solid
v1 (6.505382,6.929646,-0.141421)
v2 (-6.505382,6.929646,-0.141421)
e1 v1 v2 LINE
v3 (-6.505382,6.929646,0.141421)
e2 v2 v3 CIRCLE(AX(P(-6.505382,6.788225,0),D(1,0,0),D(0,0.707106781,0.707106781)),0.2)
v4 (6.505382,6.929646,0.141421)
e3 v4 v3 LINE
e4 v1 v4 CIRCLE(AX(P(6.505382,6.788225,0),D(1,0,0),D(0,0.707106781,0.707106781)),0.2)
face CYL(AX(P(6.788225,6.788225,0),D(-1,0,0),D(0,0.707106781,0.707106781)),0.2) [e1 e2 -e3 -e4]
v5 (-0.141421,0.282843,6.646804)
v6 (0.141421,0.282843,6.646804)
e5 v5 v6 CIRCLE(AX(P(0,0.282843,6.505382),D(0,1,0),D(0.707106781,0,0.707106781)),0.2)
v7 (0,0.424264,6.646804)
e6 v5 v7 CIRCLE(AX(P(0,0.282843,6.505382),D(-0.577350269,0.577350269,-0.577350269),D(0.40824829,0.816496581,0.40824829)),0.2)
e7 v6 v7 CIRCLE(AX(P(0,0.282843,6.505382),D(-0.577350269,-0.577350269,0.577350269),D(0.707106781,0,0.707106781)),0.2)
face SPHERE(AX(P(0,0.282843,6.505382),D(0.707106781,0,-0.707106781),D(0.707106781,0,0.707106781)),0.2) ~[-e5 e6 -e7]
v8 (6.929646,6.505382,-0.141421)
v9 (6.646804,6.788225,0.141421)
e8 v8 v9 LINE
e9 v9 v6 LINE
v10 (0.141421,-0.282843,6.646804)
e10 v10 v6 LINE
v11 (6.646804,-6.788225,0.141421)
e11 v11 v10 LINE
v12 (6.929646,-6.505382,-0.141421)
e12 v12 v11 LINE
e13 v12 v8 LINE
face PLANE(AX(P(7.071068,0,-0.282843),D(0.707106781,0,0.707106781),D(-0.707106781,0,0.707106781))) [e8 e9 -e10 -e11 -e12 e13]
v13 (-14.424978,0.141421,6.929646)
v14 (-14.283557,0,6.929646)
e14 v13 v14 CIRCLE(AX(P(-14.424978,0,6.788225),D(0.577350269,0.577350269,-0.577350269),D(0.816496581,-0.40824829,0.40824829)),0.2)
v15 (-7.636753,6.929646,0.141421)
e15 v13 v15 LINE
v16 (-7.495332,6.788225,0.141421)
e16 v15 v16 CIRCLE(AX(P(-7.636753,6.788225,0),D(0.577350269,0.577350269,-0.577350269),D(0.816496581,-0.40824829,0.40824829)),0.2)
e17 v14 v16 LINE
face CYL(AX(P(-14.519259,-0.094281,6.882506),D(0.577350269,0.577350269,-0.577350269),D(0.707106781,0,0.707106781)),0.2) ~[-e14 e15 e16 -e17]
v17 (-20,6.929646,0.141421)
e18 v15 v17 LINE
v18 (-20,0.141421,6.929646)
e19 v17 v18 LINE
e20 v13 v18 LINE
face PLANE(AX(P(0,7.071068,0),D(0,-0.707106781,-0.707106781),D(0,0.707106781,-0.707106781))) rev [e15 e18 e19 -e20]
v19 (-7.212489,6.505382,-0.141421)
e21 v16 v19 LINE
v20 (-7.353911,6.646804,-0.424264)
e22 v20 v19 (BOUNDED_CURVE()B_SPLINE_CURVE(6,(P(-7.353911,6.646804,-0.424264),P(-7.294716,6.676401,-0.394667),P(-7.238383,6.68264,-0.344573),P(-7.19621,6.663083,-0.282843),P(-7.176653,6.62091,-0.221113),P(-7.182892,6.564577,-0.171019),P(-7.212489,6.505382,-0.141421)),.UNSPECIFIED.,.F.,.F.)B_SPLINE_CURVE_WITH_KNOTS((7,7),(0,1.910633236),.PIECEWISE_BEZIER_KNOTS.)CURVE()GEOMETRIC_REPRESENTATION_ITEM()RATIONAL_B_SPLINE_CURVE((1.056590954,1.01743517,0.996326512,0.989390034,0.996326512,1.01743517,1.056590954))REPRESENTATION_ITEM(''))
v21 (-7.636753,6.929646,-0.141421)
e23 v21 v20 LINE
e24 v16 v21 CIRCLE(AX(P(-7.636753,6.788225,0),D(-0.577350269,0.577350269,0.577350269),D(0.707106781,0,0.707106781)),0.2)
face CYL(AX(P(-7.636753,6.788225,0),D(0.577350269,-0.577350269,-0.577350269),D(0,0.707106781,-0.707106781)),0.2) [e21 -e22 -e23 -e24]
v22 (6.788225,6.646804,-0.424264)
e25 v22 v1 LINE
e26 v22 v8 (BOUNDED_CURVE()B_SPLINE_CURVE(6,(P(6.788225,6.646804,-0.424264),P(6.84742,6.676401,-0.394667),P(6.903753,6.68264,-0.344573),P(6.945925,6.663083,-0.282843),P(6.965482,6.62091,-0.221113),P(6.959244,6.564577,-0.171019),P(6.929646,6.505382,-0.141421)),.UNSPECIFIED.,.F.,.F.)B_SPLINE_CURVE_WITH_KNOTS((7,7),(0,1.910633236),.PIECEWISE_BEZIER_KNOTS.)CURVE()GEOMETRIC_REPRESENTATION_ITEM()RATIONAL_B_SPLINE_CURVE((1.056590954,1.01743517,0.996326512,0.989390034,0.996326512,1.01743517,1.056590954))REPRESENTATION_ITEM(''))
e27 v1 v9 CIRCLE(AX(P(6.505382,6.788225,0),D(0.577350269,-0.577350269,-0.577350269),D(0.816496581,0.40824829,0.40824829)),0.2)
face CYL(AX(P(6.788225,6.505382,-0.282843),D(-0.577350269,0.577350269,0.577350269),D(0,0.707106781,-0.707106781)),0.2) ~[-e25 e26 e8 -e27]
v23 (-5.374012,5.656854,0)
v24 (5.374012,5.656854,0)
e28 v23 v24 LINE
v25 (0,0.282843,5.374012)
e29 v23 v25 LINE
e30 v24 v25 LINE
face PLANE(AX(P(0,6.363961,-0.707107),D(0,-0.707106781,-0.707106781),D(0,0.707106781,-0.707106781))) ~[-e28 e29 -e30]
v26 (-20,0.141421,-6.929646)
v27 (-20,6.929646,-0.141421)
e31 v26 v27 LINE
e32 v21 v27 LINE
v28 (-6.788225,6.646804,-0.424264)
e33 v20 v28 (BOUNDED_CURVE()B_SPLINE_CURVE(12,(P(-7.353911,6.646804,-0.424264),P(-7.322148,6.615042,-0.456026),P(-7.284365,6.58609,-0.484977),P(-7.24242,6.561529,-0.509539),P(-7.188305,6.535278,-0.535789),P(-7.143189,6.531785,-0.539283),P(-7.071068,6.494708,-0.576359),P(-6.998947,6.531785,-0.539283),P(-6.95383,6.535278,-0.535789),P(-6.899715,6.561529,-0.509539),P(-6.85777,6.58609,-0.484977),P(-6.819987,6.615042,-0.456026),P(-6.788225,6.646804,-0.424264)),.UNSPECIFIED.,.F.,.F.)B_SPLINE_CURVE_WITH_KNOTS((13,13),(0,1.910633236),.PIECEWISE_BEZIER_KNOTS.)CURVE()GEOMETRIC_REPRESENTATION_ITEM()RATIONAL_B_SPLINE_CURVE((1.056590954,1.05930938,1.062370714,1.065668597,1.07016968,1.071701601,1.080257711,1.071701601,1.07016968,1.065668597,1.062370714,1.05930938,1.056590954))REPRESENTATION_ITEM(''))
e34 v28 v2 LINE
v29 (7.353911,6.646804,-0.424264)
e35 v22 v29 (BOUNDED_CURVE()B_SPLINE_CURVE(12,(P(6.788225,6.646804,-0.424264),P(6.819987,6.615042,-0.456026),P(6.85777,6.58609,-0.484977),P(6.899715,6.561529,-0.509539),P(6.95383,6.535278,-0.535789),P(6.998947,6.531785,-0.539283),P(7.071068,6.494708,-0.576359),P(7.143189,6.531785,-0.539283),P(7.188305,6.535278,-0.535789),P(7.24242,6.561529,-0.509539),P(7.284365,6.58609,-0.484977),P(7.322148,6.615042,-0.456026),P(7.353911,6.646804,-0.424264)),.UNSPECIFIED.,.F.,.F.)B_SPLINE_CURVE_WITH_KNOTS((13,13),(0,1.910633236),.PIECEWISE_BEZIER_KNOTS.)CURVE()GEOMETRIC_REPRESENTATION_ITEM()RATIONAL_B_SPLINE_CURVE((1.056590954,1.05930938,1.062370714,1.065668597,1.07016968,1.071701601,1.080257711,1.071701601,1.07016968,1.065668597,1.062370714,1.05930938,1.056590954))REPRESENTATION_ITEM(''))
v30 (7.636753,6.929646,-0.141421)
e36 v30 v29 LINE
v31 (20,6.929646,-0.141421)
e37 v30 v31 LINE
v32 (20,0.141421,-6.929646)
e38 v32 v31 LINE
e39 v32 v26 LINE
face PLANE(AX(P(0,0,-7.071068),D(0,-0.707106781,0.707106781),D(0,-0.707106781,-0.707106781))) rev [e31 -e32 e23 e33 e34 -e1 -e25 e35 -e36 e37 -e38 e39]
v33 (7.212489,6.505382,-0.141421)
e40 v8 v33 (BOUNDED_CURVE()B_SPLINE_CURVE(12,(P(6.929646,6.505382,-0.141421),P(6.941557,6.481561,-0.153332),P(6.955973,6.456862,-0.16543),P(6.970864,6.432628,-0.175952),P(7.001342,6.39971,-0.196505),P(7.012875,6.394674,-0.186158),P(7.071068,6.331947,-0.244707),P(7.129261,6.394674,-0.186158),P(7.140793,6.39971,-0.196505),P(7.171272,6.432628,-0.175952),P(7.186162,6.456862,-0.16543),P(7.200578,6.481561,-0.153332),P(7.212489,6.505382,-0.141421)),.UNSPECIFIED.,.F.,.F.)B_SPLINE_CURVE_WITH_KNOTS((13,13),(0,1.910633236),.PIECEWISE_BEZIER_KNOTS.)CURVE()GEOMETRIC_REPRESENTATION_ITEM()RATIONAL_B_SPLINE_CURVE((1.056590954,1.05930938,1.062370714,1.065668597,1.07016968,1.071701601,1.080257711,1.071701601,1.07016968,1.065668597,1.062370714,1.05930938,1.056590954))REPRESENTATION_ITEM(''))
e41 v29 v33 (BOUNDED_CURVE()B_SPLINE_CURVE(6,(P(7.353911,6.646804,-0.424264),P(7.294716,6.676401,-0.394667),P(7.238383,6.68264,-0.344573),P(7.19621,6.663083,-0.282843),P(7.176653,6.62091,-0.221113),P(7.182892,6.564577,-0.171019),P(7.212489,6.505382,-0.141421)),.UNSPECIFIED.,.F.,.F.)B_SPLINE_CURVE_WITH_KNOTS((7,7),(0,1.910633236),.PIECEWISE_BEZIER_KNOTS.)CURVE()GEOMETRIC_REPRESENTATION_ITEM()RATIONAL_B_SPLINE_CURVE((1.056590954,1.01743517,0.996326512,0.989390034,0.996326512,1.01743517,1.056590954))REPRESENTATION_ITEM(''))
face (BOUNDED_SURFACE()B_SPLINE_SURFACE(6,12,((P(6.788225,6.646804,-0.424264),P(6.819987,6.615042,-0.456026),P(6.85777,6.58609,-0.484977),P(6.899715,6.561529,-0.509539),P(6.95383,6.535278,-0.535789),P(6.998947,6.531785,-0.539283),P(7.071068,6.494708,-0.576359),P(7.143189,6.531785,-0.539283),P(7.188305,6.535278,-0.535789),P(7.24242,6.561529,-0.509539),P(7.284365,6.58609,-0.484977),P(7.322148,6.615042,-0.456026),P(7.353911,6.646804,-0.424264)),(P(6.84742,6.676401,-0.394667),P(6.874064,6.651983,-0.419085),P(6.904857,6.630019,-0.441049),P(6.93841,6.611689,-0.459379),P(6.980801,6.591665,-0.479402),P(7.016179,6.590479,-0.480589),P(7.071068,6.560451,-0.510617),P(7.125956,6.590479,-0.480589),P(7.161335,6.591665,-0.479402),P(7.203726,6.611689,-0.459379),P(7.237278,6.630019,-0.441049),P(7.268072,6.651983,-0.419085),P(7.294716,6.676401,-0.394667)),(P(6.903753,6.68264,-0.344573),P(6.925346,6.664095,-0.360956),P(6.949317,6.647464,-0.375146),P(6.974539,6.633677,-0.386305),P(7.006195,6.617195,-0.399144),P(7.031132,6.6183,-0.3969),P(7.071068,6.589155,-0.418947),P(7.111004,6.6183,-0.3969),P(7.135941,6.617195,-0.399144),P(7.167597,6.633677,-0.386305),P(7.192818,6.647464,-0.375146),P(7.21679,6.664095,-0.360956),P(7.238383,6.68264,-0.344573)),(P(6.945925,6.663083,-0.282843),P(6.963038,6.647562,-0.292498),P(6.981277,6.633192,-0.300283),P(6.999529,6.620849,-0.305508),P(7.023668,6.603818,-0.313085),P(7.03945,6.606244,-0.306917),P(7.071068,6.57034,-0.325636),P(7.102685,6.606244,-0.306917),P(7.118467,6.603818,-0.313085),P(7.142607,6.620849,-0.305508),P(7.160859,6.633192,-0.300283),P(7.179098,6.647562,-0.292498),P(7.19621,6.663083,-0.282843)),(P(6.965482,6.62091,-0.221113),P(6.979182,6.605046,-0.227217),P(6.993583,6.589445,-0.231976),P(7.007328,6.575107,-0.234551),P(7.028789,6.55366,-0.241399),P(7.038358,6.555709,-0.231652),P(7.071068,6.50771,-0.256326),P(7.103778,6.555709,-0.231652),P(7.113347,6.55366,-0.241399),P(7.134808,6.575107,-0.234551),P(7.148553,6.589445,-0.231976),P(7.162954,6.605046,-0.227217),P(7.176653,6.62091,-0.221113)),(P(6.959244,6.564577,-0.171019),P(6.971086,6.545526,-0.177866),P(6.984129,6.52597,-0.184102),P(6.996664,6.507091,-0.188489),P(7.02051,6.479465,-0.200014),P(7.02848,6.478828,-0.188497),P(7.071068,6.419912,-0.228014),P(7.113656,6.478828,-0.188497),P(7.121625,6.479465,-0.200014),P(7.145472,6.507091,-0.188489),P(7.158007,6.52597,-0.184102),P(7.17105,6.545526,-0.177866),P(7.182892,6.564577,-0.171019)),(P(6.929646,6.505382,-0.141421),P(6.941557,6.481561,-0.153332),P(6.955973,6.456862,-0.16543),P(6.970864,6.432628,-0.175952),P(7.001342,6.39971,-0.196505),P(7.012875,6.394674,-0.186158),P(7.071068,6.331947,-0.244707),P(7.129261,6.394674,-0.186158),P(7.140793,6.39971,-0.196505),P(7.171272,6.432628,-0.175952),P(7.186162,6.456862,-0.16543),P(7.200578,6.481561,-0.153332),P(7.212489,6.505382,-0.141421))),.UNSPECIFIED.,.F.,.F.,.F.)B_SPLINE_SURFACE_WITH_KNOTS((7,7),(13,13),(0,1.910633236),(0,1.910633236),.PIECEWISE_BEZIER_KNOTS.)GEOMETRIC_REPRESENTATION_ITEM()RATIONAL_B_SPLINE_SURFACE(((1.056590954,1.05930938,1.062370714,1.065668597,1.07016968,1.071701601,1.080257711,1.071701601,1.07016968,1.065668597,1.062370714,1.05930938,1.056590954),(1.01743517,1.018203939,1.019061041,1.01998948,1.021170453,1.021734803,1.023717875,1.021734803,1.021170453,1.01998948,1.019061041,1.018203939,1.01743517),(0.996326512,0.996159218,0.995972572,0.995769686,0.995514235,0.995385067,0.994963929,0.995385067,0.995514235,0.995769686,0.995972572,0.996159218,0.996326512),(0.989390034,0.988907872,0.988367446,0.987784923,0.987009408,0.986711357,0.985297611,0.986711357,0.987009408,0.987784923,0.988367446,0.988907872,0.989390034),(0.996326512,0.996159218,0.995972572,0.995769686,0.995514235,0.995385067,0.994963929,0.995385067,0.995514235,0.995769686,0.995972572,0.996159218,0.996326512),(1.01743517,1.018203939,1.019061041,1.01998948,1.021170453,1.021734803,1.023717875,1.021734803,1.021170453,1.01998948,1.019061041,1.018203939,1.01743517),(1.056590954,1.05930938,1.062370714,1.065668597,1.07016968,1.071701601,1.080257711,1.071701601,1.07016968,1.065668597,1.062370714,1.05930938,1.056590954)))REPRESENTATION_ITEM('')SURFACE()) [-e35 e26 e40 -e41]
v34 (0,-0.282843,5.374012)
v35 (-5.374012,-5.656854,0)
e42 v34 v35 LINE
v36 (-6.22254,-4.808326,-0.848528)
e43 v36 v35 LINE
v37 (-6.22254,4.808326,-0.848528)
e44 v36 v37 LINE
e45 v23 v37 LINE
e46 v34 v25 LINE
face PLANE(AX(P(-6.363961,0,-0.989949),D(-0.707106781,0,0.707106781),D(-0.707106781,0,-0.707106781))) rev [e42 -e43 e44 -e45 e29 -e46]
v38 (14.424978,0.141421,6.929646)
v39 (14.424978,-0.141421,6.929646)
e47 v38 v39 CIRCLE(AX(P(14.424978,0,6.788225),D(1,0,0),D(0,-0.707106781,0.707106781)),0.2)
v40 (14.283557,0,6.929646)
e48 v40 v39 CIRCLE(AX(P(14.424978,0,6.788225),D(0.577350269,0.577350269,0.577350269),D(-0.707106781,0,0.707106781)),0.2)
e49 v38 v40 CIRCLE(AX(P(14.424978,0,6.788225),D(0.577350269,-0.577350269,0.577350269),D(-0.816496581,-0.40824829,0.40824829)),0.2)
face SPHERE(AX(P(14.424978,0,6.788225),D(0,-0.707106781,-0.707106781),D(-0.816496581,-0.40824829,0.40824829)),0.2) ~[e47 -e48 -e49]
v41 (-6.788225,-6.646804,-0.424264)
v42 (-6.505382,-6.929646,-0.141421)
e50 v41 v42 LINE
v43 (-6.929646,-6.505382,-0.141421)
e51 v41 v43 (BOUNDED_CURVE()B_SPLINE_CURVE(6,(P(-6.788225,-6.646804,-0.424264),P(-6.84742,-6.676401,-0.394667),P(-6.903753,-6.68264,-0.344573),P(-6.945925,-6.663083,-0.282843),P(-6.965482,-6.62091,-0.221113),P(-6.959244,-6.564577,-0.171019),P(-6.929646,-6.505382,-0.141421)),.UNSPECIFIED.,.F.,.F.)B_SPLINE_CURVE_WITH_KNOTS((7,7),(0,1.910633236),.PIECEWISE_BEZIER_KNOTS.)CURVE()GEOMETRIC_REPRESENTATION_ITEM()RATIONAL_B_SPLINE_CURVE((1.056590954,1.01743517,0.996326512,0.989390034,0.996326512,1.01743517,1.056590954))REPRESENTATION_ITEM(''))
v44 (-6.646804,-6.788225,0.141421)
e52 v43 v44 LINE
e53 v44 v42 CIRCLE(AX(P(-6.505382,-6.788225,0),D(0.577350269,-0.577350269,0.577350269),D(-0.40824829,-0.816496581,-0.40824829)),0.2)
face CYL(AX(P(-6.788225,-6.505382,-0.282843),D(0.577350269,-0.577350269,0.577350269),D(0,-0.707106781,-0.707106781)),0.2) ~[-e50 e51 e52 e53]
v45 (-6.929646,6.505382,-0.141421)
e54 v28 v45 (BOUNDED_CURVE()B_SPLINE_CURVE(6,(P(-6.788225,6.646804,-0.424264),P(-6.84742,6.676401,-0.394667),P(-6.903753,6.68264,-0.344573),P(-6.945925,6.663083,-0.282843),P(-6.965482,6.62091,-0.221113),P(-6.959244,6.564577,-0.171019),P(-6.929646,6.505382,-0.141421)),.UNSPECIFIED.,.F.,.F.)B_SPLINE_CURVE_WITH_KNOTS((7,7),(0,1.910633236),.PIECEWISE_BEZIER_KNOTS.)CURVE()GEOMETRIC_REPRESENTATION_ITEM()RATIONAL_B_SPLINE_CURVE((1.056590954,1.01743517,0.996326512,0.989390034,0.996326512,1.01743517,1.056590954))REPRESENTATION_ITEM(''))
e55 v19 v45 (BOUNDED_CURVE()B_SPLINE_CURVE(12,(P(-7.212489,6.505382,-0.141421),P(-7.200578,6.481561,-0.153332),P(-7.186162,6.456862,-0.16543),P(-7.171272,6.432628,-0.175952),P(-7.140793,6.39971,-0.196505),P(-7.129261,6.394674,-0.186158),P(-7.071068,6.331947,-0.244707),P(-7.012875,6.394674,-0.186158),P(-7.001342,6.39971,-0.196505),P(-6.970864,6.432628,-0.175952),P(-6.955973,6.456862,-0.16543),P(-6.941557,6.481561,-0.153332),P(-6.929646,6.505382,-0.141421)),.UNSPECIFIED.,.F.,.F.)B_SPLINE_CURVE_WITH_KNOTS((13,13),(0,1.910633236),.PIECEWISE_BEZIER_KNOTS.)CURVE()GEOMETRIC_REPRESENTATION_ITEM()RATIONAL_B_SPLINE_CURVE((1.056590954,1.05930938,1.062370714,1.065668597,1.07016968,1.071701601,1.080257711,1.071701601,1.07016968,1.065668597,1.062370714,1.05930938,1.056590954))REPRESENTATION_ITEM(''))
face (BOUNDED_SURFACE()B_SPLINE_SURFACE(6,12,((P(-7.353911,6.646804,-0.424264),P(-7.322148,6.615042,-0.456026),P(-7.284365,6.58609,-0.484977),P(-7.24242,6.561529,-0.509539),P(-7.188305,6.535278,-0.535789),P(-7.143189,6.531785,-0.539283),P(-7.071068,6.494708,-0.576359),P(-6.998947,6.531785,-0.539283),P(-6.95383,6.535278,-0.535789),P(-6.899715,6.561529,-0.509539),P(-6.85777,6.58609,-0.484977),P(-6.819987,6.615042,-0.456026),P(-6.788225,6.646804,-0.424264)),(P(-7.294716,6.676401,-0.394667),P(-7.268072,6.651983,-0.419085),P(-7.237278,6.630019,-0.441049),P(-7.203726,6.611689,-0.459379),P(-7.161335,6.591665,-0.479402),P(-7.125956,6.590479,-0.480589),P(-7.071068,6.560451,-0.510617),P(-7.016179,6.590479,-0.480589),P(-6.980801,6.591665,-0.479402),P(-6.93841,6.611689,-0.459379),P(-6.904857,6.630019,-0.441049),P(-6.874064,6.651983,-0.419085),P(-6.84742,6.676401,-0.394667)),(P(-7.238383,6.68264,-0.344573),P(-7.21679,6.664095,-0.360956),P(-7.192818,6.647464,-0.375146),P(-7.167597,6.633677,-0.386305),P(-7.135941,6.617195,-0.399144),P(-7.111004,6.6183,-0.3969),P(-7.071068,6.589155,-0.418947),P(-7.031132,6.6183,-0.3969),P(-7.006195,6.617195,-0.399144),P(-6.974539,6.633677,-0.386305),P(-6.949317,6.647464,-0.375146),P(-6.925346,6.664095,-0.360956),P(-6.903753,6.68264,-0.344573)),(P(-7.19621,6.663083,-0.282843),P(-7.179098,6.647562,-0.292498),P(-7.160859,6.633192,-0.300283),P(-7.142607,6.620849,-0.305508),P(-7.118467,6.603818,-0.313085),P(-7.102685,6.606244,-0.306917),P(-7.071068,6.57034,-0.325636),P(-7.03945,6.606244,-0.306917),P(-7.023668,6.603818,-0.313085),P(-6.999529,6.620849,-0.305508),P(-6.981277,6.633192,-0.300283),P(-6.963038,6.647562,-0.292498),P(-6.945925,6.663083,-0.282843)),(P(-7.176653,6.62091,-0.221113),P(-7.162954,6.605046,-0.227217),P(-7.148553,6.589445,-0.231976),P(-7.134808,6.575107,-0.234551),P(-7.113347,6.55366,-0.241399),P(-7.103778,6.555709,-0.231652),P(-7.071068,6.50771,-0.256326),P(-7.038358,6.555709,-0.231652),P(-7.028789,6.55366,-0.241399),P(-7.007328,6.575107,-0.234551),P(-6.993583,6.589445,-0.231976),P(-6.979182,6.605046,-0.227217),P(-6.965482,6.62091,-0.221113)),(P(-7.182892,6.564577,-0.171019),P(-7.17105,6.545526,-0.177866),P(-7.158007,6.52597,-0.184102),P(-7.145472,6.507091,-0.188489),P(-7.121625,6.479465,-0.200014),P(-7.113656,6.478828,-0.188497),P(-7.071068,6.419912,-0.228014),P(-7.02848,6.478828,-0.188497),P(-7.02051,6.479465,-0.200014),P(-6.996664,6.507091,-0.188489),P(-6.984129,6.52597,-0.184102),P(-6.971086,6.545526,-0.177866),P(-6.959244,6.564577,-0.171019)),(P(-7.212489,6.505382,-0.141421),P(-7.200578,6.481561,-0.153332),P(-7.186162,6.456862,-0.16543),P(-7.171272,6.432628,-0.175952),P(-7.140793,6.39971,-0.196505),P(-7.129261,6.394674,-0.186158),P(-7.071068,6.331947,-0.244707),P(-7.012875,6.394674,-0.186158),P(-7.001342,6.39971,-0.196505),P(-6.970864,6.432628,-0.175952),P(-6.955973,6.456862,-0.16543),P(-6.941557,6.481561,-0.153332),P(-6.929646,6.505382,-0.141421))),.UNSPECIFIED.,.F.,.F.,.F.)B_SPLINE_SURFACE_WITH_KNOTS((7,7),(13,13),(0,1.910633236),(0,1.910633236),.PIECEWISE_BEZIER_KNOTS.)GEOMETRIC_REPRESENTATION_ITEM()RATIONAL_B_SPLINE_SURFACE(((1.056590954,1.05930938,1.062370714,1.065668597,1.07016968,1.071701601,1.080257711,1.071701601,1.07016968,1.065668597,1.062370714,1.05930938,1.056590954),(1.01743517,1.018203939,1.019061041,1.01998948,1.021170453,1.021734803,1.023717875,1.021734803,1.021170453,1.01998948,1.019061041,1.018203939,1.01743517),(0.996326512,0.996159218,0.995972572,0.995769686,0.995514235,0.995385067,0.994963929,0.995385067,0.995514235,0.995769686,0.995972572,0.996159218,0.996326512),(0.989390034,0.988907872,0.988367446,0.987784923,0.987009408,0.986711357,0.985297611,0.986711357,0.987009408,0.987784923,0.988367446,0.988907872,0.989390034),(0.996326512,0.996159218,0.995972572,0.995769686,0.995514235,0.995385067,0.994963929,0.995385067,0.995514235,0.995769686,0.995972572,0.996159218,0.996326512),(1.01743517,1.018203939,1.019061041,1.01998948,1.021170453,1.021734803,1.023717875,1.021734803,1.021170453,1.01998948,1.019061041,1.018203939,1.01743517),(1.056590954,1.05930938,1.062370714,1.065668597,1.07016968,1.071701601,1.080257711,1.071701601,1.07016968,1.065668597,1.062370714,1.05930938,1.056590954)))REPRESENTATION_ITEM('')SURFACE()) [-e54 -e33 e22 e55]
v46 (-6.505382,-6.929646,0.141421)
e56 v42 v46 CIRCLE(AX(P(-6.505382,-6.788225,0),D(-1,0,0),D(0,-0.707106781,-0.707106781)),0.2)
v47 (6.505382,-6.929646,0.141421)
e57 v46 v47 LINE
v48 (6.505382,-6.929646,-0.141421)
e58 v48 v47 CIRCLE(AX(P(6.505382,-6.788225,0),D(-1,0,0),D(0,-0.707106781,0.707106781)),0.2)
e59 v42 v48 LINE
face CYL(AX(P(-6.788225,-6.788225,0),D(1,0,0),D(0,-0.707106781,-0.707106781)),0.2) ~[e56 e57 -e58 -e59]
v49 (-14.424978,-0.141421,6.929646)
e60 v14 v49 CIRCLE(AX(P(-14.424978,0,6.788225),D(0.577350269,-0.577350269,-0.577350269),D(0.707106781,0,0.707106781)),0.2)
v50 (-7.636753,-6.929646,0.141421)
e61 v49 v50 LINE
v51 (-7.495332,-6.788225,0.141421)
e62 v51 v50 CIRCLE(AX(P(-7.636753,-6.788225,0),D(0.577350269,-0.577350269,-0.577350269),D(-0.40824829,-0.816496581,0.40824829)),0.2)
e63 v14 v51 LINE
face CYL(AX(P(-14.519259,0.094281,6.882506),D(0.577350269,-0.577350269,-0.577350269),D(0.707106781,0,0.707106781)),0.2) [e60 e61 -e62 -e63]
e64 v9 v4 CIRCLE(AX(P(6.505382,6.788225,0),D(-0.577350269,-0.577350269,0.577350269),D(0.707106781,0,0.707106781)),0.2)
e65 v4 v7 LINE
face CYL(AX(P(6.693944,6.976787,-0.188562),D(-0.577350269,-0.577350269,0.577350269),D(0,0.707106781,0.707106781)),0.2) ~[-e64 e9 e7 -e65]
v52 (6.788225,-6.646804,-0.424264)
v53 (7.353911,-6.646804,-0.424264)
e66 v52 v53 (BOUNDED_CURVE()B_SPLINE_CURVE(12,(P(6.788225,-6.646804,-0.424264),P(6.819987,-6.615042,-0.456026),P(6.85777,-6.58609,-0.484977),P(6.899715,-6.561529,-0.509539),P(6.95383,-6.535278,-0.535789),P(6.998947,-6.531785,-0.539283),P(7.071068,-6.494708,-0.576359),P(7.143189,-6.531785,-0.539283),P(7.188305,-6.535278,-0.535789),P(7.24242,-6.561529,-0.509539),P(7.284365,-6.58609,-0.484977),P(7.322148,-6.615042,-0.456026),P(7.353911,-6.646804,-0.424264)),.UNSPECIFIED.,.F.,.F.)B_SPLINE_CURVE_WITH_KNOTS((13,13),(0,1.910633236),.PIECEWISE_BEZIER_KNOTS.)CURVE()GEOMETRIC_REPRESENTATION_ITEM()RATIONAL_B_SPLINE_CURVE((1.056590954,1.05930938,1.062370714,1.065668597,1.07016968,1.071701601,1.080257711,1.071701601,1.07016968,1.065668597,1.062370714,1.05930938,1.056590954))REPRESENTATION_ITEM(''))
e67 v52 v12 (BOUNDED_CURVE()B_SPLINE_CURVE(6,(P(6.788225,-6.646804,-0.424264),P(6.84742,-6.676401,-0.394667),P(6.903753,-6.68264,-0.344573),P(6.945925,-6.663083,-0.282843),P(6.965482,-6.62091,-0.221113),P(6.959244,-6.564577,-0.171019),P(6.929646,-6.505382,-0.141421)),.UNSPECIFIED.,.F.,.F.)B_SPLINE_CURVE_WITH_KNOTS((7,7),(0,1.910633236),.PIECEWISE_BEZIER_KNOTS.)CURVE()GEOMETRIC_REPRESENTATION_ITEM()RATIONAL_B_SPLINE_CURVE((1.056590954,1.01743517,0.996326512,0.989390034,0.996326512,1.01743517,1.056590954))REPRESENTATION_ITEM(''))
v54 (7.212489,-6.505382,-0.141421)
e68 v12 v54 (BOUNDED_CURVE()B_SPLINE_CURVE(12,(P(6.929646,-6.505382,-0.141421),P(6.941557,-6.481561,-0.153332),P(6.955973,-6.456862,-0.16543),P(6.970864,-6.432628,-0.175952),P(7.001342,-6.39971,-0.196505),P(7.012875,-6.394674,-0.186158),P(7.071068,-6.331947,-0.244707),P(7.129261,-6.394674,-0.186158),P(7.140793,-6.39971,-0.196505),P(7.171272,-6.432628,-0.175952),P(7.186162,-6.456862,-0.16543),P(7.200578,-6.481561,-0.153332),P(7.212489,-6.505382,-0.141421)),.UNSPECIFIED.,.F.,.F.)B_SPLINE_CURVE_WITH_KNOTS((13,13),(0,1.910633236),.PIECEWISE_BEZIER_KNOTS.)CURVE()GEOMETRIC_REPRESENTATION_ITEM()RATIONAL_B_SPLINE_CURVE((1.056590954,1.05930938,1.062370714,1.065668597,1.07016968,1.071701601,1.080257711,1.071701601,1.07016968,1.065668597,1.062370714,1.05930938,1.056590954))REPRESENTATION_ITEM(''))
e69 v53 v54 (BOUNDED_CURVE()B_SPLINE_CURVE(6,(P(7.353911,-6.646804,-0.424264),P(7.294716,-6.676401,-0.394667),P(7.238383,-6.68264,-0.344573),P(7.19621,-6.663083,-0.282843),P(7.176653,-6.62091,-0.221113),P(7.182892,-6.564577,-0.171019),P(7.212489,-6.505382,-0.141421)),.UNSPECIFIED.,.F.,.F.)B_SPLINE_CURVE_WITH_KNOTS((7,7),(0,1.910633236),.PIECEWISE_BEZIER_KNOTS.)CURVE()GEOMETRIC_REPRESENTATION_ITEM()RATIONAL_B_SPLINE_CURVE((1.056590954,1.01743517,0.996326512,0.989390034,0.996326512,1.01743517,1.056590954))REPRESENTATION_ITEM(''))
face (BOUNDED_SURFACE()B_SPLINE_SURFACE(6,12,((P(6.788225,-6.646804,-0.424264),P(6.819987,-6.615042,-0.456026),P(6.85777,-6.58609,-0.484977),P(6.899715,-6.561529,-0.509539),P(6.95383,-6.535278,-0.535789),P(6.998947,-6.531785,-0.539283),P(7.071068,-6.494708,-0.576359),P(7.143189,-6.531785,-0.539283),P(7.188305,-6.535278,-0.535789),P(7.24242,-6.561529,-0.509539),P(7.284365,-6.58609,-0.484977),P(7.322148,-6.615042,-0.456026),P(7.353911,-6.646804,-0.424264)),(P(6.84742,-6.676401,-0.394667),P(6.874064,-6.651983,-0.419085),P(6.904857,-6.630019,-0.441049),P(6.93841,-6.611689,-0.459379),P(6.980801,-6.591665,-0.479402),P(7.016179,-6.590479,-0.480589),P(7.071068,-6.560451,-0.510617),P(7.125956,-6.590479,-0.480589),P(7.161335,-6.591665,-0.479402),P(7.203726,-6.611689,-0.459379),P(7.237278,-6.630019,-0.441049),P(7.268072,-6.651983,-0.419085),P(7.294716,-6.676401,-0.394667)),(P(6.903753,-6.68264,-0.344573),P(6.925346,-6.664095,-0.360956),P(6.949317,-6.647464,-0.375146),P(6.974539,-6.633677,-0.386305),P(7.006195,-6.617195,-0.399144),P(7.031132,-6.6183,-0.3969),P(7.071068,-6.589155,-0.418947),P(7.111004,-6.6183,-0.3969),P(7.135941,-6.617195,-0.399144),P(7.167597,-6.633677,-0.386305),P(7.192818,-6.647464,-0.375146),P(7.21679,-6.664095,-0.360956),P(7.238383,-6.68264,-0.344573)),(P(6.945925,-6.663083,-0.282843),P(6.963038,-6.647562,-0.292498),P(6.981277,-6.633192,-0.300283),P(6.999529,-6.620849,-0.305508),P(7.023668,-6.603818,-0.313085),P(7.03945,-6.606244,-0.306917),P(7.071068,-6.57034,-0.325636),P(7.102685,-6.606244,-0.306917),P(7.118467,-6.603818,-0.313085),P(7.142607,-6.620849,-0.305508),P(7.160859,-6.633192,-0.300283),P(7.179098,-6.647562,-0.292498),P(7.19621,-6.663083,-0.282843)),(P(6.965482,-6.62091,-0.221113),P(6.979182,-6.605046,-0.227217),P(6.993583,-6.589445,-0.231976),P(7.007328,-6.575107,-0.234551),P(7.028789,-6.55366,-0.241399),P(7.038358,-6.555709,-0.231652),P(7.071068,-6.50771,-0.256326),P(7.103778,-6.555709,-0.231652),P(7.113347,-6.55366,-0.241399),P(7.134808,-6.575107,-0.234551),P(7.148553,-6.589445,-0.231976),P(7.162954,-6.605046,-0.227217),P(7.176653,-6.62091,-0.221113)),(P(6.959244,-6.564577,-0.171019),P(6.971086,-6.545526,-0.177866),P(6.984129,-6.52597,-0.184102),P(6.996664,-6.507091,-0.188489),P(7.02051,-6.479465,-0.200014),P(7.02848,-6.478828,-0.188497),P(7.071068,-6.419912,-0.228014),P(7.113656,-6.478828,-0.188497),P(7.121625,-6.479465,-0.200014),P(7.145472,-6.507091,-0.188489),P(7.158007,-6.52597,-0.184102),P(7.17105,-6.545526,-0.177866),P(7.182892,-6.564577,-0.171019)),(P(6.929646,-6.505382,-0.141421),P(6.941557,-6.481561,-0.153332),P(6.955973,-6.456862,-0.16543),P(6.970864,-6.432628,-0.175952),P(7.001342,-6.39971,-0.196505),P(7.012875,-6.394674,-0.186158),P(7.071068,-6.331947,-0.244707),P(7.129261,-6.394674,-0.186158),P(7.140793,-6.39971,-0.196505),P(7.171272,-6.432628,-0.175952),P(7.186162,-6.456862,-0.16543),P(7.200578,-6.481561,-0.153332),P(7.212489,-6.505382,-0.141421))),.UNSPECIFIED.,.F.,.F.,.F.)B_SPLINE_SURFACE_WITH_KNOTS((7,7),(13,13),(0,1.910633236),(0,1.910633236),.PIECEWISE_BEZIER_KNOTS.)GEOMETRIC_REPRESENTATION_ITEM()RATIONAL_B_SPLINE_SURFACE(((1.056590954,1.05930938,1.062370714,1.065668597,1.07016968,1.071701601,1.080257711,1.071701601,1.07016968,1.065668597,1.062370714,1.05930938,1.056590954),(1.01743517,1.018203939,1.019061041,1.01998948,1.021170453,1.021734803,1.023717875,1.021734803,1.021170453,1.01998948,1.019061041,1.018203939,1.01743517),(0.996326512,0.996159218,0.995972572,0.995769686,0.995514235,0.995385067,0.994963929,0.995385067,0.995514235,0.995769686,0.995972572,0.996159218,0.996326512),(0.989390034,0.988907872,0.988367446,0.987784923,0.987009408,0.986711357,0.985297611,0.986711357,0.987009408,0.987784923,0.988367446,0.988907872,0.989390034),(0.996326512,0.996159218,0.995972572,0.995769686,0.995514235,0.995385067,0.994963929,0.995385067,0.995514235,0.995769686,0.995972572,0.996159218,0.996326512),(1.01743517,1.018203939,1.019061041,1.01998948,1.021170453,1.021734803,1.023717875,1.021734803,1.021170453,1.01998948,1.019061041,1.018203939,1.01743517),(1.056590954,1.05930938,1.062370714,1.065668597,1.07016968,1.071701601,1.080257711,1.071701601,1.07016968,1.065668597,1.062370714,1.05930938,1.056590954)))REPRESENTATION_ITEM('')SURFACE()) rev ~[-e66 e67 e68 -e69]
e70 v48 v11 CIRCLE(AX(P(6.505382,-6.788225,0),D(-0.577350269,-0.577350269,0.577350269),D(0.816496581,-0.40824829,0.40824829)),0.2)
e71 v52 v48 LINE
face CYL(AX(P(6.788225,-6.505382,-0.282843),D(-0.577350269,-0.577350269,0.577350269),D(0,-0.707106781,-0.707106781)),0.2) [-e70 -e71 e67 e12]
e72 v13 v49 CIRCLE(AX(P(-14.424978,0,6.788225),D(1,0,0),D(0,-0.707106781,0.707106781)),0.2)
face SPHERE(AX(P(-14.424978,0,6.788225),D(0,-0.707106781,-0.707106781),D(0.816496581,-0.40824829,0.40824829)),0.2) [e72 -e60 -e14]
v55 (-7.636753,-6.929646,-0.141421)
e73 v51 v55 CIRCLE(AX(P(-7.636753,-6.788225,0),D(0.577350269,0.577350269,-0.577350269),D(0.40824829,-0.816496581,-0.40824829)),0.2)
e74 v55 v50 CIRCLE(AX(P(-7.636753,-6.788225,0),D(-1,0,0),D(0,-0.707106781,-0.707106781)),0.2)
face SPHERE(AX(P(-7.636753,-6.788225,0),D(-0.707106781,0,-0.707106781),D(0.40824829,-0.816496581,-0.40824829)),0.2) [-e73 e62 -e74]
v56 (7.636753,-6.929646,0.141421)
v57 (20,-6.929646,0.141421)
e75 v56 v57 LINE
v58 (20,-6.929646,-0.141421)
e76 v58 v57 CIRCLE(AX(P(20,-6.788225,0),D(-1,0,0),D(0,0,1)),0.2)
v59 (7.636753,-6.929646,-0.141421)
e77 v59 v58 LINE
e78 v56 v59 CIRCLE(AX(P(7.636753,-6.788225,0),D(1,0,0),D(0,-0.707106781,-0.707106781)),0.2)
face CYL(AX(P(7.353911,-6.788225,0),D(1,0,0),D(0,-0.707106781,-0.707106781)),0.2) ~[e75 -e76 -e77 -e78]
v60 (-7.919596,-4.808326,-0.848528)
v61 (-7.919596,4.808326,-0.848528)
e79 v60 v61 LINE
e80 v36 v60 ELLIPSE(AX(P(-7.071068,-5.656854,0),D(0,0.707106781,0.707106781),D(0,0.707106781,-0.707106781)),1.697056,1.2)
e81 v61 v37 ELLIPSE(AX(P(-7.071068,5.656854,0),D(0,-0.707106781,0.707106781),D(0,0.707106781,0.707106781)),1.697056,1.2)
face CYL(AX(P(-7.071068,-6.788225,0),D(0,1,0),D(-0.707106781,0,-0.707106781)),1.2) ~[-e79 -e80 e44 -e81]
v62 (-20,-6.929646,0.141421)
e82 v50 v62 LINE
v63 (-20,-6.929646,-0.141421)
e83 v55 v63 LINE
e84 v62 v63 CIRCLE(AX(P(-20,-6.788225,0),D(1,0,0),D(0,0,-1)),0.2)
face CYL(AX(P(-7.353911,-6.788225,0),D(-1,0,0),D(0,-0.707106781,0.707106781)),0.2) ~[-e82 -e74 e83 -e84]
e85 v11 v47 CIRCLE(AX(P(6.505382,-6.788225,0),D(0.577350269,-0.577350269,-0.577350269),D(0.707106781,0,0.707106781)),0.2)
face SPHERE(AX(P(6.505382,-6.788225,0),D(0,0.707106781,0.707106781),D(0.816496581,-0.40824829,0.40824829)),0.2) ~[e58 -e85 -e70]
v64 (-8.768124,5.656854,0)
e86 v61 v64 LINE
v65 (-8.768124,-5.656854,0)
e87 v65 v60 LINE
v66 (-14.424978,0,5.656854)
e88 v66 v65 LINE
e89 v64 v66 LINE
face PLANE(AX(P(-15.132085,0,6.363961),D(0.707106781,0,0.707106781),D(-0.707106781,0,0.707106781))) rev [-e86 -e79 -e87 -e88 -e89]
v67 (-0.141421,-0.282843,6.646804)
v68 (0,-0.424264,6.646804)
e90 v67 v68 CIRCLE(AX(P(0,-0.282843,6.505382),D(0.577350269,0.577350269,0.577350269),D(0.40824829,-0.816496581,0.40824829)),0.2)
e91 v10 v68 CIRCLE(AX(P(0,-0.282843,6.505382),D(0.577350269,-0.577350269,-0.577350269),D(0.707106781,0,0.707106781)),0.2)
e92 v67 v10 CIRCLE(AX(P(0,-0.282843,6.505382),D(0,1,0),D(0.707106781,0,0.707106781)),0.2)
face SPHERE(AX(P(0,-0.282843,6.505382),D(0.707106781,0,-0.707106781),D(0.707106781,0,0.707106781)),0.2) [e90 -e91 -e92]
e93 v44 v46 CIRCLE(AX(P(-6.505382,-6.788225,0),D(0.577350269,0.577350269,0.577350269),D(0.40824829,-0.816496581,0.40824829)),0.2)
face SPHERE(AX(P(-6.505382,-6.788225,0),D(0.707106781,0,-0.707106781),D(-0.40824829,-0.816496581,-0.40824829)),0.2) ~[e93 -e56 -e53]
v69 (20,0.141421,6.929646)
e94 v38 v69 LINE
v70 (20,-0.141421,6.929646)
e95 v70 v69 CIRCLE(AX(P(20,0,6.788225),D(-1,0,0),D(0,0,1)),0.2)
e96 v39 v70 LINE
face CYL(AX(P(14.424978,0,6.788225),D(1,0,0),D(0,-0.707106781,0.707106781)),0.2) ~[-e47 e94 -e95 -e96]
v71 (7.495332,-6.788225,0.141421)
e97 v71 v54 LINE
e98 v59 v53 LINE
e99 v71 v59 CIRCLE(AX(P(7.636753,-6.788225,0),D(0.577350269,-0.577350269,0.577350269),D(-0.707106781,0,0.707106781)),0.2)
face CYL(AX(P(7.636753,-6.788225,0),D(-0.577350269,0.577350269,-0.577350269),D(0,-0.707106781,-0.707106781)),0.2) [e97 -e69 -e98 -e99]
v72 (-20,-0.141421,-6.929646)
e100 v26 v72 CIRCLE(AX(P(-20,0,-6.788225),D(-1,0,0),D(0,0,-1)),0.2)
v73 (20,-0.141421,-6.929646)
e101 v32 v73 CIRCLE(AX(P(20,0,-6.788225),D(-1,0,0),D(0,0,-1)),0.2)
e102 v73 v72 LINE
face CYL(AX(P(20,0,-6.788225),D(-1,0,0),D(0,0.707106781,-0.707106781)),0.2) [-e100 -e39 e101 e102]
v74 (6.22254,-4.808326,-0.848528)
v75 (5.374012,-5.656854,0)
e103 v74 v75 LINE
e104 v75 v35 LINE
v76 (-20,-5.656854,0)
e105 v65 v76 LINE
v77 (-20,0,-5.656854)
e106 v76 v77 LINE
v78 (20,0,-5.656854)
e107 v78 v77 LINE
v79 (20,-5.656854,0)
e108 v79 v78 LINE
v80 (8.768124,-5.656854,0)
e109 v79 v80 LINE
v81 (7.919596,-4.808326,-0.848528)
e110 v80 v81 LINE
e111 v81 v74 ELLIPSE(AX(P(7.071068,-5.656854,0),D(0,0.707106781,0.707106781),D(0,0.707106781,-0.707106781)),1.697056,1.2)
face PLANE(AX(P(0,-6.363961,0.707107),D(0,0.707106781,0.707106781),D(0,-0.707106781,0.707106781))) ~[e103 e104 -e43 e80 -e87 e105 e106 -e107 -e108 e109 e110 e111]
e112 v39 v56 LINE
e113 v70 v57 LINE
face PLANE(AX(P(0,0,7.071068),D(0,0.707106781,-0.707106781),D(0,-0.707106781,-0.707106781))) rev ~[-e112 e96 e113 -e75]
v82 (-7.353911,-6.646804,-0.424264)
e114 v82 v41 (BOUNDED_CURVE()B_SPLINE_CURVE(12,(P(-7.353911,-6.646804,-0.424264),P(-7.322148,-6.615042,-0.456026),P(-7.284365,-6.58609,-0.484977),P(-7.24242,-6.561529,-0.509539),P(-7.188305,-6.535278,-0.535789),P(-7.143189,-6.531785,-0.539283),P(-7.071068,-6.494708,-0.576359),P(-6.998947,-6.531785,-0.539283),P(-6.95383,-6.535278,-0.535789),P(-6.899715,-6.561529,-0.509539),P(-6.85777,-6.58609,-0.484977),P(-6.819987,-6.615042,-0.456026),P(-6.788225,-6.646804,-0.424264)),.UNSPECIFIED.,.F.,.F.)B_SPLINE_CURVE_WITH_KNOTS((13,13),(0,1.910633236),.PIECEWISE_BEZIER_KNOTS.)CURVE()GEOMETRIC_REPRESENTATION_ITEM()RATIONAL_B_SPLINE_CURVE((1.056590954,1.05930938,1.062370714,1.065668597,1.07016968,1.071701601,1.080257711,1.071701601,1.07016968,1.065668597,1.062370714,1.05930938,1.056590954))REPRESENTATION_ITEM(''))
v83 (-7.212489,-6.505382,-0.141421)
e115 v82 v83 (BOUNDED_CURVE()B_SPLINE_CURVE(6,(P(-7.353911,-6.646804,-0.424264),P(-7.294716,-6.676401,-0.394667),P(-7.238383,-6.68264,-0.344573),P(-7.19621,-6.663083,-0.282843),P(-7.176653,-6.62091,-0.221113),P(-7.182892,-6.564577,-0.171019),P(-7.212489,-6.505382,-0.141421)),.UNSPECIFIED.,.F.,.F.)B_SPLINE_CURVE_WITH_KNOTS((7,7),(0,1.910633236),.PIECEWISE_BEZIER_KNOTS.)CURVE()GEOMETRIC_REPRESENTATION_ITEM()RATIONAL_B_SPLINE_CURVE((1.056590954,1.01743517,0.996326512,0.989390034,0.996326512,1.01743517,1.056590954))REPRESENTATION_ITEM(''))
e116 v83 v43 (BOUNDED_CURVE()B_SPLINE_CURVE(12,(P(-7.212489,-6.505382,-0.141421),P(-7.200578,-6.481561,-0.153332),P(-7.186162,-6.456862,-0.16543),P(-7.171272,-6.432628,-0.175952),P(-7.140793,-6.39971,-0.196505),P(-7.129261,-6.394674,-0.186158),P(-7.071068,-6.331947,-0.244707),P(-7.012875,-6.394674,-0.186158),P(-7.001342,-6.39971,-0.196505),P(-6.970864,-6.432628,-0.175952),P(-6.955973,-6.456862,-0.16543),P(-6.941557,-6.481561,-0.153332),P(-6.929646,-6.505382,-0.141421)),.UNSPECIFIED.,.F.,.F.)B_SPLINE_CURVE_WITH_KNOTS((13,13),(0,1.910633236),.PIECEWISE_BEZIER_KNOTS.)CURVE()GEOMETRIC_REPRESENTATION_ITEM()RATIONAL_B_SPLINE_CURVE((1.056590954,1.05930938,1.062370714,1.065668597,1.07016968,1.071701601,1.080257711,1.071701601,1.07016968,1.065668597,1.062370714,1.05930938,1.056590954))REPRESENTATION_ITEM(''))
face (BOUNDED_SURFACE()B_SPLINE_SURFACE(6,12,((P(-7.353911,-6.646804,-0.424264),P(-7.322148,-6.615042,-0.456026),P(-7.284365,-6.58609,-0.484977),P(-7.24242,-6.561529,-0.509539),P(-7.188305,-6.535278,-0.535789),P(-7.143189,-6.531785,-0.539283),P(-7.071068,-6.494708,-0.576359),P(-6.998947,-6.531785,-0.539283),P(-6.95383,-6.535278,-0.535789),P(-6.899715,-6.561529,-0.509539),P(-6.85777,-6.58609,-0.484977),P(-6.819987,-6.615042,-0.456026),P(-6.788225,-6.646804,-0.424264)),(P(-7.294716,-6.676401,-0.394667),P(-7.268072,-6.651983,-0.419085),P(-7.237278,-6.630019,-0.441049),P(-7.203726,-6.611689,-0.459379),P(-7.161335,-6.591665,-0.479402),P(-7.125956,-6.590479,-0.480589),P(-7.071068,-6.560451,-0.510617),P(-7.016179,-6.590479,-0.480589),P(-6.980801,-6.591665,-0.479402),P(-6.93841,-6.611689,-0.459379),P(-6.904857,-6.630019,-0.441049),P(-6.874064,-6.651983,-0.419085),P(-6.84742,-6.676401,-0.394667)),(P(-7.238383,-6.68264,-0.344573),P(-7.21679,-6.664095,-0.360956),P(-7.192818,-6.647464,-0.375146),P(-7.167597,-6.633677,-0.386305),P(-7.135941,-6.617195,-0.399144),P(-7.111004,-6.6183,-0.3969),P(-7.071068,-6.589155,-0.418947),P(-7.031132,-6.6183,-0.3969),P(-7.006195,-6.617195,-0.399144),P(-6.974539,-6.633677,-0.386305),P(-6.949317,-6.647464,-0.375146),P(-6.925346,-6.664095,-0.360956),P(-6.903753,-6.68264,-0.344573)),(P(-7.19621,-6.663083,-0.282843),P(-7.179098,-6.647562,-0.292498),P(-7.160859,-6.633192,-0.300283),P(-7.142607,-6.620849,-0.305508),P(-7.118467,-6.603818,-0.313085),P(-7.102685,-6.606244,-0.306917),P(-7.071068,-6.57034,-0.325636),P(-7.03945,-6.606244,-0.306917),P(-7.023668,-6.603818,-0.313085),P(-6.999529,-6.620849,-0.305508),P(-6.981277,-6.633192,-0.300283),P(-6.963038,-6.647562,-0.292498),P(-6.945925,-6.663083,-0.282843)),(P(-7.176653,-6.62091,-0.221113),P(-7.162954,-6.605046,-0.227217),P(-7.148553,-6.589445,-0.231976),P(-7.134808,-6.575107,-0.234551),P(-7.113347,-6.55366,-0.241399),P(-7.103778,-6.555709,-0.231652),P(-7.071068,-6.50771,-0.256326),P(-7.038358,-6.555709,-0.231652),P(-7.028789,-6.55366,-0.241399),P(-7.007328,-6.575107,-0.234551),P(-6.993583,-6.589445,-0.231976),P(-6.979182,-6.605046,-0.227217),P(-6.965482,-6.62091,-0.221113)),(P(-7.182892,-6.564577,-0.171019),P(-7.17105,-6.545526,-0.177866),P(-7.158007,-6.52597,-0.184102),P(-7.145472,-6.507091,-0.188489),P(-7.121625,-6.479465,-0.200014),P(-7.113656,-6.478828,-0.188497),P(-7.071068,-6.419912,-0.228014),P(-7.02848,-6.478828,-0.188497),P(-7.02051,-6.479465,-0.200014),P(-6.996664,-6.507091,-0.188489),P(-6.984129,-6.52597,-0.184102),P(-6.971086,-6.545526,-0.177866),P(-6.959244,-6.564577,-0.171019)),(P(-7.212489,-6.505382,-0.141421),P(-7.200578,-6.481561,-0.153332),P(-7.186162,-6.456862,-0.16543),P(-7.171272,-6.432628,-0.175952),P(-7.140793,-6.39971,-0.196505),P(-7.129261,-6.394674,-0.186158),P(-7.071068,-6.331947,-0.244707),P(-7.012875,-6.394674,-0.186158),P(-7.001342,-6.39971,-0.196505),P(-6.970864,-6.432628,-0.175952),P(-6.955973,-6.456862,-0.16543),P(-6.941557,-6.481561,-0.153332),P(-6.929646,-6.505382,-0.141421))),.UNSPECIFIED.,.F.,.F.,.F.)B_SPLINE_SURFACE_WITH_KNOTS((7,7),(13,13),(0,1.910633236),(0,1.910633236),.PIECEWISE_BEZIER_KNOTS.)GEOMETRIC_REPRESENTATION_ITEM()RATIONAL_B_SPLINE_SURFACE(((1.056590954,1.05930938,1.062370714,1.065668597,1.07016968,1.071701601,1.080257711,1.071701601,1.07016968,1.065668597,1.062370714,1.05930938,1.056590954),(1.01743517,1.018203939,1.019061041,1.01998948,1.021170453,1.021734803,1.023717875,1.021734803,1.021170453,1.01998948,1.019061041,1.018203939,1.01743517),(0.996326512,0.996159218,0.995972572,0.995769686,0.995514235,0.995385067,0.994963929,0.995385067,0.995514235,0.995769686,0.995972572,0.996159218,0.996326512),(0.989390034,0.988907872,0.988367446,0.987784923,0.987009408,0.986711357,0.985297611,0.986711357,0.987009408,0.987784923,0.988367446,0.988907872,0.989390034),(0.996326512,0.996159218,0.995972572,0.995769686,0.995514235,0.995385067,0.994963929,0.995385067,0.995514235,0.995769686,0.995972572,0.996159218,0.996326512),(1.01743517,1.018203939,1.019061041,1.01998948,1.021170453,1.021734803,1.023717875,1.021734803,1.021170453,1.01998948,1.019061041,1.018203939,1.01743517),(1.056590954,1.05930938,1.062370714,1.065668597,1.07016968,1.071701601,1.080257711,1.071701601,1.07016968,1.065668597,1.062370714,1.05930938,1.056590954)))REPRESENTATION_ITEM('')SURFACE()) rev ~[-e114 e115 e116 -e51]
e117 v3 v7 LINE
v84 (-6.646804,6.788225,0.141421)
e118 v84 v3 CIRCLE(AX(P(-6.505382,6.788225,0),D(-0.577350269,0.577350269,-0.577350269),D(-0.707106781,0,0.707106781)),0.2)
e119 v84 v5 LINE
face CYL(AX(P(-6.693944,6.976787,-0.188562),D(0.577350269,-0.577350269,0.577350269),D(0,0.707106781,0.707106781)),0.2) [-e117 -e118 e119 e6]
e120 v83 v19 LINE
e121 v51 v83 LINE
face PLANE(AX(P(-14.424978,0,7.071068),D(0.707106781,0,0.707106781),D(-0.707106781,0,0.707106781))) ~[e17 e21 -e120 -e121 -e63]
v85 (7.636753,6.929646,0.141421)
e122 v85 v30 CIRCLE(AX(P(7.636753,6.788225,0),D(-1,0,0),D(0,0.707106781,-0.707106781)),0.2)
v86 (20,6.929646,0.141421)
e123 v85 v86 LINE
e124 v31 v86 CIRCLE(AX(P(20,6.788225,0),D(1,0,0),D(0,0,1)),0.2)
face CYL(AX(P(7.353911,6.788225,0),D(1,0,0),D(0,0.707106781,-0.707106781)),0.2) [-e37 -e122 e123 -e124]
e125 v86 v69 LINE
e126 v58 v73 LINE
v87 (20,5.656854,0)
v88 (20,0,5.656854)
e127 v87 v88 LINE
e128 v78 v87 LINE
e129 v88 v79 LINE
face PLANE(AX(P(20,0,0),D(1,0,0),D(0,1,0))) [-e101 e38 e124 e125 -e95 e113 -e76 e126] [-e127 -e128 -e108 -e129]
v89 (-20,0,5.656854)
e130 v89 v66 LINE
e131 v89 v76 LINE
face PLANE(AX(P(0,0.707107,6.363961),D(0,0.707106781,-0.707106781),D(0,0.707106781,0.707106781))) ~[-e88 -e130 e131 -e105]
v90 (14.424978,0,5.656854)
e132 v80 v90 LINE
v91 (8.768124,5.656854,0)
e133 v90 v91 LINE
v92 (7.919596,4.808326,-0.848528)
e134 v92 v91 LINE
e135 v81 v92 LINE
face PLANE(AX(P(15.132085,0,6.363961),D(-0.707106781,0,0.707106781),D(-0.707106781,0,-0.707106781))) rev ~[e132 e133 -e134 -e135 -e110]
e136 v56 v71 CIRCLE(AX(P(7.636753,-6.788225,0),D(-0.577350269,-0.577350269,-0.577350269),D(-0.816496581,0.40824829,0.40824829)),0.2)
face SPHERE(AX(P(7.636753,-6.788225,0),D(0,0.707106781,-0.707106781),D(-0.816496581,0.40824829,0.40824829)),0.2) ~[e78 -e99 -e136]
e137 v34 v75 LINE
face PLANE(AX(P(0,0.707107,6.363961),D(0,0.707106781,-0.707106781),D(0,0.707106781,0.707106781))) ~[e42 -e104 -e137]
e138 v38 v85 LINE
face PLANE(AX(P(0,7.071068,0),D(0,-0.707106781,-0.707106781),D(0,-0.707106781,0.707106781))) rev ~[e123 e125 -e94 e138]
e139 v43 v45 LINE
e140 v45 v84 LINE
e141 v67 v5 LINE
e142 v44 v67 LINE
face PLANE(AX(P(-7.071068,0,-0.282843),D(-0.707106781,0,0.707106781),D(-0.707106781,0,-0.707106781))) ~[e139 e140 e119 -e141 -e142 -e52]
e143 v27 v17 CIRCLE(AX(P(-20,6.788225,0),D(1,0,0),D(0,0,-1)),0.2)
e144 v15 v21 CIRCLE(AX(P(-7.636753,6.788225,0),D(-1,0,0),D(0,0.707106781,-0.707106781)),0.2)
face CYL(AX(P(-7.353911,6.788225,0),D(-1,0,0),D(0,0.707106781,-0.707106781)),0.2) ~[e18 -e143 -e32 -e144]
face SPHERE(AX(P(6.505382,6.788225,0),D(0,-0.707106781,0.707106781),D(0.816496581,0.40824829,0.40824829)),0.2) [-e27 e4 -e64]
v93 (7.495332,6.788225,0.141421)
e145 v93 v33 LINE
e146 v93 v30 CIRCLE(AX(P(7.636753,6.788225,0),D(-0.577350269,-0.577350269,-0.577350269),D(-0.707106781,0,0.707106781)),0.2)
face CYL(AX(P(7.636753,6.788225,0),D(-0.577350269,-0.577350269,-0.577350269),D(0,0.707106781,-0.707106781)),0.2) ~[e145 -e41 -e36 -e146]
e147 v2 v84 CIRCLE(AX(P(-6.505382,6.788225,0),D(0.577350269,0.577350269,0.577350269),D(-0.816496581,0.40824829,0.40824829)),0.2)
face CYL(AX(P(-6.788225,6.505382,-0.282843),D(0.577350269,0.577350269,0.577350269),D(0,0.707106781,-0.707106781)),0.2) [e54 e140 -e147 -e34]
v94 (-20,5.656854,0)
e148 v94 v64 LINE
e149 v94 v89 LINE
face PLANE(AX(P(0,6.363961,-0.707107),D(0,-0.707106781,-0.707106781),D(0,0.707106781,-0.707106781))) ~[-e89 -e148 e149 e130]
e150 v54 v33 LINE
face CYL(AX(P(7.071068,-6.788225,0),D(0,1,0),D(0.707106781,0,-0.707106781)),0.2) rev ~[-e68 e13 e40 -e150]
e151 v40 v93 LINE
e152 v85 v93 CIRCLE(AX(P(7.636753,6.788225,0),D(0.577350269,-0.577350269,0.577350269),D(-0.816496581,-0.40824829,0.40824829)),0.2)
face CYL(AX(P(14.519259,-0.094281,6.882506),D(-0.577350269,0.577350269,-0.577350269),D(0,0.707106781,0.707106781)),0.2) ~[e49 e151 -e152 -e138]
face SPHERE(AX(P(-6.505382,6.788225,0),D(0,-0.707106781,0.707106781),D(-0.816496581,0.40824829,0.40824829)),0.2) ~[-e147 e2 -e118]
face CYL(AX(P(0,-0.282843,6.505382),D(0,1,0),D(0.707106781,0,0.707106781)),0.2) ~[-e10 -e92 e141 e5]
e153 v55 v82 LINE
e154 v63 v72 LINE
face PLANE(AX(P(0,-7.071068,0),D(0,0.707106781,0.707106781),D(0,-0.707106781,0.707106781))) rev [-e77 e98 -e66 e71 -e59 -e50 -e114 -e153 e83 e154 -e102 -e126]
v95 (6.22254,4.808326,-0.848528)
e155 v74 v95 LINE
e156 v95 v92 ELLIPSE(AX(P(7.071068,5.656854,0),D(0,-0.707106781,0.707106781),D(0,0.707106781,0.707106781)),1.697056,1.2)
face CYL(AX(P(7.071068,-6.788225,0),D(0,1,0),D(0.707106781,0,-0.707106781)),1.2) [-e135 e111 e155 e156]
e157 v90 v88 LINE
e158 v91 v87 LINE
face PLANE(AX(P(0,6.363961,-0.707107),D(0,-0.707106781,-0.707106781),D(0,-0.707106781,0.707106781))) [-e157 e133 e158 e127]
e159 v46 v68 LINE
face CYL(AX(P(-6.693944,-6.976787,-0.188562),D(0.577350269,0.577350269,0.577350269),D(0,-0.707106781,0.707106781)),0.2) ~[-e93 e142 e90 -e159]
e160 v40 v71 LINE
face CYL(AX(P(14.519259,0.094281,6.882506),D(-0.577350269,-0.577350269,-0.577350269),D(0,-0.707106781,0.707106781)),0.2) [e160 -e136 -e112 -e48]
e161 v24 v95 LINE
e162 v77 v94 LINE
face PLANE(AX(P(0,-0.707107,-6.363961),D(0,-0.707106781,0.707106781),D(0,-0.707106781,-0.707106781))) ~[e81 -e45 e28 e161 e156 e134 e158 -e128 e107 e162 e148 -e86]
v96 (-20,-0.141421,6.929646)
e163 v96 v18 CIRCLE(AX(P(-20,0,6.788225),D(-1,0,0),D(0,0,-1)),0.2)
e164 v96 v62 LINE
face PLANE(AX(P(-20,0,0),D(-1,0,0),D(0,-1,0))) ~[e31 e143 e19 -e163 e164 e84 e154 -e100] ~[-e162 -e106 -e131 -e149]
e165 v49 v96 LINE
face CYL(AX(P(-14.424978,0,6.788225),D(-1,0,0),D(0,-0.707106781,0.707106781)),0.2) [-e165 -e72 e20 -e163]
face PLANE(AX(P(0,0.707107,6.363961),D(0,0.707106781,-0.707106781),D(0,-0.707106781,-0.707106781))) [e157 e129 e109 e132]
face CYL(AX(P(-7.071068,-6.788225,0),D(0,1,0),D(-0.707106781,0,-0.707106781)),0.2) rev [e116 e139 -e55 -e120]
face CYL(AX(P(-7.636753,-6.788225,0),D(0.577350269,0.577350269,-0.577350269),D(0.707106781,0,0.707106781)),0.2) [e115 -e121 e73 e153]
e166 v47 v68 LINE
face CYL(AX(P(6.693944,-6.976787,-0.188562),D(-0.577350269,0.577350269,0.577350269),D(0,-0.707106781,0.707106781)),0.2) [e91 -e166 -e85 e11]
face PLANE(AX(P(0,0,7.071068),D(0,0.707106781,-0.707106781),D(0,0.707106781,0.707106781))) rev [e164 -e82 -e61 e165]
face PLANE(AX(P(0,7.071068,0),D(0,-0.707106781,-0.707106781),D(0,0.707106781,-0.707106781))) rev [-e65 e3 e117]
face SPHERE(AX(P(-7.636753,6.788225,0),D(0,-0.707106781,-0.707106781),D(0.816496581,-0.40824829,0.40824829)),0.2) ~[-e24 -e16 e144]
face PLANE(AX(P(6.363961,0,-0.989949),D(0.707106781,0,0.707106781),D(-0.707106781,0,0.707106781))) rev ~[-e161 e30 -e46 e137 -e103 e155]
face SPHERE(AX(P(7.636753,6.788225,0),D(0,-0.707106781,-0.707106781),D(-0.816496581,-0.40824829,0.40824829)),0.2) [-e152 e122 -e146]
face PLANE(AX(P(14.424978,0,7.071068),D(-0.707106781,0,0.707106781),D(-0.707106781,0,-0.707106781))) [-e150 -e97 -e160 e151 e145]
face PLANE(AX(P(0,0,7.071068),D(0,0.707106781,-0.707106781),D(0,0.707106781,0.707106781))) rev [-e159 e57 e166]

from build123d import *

# Parameters (mm, degrees)
F1_DEPTH      = 20
F4_DEPTH      = 7.0720678119
F4_DEPTH_BACK = 7.0720678119
F8_R          = 0.2
F9_T          = -1


# Not quite as in the source:
# - the program builds the solid bodies; features that only make, move or delete a surface that nothing else refers to are left out


with BuildPart() as f1:
    # F0 (on Right) → F1 (new body)
    with BuildSketch(Plane.YZ):
        Polygon((7.0710678119, 0), (0, 7.0710678119), (-7.0710678119, 0), (0, -7.0710678119), align=None)
    extrude(amount=F1_DEPTH)

    # F3 (on 3pt) → F4 (cut, two sides)
    with BuildSketch(Plane(origin=(0, 0, 0), x_dir=(-1, 0, 0), z_dir=(0, 1, 0))) as f4_sk:
        Polygon((0.2828427125, 7.0710678119), (-7.0710678119, 14.4249783362), (-14.4249783362, 7.0710678119), (-7.0710678119, -0.2828427125), align=None)
    extrude(amount=-F4_DEPTH, mode=Mode.SUBTRACT)
    extrude(f4_sk.sketch, amount=F4_DEPTH_BACK, mode=Mode.SUBTRACT)

    # F7: F1 across face


with BuildPart() as f1_1:
    add(f1.part)
    add(f1.part.mirror(Plane(origin=(0, 0, -0.0055104131), x_dir=(0, 1, 0), z_dir=(-1, 0, 0))))

    # F8
    f8_edges = [f1_1.edges().sort_by_distance(p)[0] for p in [
        (7.071068, 0, -0.282843),
        (3.394113, -3.676955, 3.394113),
        (3.394113, 3.676955, 3.394113),
        (0, 0, 6.788225),
        (6.929646, -6.929646, -0.141421),
        (6.929646, 6.929646, -0.141421),
        (7.212489, 6.929646, -0.141421),
        (7.212489, -6.929646, -0.141421),
        (10.889444, -3.535534, 3.535534),
        (10.889444, 3.535534, 3.535534),
        (17.212489, 0, 7.071068),
        (13.676955, 7.071068, 0),
        (13.676955, -7.071068, 0),
        (0, -7.071068, 0),
        (-13.676955, -7.071068, 0),
        (-7.212489, -6.929646, -0.141421),
        (-6.929646, -6.929646, -0.141421),
        (-10.889444, -3.535534, 3.535534),
        (-3.394113, -3.676955, 3.394113),
        (-3.394113, 3.676955, 3.394113),
        (-7.071068, 0, -0.282843),
        (-7.212489, 6.929646, -0.141421),
        (-6.929646, 6.929646, -0.141421),
        (-10.889444, 3.535534, 3.535534),
        (-17.212489, 0, 7.071068),
        (-13.676955, 7.071068, 0),
        (0, 7.071068, 0),
        (0, 0, -7.071068),
    ]]
    fillet(f8_edges, radius=F8_R)

    # F9
    f9_openings = [f1_1.faces().sort_by_distance(p)[0] for p in [
        (20, 0, 0),
        (-20, 0, 0),
    ]]
    offset(amount=F9_T, openings=f9_openings)


solid = f1_1.part
